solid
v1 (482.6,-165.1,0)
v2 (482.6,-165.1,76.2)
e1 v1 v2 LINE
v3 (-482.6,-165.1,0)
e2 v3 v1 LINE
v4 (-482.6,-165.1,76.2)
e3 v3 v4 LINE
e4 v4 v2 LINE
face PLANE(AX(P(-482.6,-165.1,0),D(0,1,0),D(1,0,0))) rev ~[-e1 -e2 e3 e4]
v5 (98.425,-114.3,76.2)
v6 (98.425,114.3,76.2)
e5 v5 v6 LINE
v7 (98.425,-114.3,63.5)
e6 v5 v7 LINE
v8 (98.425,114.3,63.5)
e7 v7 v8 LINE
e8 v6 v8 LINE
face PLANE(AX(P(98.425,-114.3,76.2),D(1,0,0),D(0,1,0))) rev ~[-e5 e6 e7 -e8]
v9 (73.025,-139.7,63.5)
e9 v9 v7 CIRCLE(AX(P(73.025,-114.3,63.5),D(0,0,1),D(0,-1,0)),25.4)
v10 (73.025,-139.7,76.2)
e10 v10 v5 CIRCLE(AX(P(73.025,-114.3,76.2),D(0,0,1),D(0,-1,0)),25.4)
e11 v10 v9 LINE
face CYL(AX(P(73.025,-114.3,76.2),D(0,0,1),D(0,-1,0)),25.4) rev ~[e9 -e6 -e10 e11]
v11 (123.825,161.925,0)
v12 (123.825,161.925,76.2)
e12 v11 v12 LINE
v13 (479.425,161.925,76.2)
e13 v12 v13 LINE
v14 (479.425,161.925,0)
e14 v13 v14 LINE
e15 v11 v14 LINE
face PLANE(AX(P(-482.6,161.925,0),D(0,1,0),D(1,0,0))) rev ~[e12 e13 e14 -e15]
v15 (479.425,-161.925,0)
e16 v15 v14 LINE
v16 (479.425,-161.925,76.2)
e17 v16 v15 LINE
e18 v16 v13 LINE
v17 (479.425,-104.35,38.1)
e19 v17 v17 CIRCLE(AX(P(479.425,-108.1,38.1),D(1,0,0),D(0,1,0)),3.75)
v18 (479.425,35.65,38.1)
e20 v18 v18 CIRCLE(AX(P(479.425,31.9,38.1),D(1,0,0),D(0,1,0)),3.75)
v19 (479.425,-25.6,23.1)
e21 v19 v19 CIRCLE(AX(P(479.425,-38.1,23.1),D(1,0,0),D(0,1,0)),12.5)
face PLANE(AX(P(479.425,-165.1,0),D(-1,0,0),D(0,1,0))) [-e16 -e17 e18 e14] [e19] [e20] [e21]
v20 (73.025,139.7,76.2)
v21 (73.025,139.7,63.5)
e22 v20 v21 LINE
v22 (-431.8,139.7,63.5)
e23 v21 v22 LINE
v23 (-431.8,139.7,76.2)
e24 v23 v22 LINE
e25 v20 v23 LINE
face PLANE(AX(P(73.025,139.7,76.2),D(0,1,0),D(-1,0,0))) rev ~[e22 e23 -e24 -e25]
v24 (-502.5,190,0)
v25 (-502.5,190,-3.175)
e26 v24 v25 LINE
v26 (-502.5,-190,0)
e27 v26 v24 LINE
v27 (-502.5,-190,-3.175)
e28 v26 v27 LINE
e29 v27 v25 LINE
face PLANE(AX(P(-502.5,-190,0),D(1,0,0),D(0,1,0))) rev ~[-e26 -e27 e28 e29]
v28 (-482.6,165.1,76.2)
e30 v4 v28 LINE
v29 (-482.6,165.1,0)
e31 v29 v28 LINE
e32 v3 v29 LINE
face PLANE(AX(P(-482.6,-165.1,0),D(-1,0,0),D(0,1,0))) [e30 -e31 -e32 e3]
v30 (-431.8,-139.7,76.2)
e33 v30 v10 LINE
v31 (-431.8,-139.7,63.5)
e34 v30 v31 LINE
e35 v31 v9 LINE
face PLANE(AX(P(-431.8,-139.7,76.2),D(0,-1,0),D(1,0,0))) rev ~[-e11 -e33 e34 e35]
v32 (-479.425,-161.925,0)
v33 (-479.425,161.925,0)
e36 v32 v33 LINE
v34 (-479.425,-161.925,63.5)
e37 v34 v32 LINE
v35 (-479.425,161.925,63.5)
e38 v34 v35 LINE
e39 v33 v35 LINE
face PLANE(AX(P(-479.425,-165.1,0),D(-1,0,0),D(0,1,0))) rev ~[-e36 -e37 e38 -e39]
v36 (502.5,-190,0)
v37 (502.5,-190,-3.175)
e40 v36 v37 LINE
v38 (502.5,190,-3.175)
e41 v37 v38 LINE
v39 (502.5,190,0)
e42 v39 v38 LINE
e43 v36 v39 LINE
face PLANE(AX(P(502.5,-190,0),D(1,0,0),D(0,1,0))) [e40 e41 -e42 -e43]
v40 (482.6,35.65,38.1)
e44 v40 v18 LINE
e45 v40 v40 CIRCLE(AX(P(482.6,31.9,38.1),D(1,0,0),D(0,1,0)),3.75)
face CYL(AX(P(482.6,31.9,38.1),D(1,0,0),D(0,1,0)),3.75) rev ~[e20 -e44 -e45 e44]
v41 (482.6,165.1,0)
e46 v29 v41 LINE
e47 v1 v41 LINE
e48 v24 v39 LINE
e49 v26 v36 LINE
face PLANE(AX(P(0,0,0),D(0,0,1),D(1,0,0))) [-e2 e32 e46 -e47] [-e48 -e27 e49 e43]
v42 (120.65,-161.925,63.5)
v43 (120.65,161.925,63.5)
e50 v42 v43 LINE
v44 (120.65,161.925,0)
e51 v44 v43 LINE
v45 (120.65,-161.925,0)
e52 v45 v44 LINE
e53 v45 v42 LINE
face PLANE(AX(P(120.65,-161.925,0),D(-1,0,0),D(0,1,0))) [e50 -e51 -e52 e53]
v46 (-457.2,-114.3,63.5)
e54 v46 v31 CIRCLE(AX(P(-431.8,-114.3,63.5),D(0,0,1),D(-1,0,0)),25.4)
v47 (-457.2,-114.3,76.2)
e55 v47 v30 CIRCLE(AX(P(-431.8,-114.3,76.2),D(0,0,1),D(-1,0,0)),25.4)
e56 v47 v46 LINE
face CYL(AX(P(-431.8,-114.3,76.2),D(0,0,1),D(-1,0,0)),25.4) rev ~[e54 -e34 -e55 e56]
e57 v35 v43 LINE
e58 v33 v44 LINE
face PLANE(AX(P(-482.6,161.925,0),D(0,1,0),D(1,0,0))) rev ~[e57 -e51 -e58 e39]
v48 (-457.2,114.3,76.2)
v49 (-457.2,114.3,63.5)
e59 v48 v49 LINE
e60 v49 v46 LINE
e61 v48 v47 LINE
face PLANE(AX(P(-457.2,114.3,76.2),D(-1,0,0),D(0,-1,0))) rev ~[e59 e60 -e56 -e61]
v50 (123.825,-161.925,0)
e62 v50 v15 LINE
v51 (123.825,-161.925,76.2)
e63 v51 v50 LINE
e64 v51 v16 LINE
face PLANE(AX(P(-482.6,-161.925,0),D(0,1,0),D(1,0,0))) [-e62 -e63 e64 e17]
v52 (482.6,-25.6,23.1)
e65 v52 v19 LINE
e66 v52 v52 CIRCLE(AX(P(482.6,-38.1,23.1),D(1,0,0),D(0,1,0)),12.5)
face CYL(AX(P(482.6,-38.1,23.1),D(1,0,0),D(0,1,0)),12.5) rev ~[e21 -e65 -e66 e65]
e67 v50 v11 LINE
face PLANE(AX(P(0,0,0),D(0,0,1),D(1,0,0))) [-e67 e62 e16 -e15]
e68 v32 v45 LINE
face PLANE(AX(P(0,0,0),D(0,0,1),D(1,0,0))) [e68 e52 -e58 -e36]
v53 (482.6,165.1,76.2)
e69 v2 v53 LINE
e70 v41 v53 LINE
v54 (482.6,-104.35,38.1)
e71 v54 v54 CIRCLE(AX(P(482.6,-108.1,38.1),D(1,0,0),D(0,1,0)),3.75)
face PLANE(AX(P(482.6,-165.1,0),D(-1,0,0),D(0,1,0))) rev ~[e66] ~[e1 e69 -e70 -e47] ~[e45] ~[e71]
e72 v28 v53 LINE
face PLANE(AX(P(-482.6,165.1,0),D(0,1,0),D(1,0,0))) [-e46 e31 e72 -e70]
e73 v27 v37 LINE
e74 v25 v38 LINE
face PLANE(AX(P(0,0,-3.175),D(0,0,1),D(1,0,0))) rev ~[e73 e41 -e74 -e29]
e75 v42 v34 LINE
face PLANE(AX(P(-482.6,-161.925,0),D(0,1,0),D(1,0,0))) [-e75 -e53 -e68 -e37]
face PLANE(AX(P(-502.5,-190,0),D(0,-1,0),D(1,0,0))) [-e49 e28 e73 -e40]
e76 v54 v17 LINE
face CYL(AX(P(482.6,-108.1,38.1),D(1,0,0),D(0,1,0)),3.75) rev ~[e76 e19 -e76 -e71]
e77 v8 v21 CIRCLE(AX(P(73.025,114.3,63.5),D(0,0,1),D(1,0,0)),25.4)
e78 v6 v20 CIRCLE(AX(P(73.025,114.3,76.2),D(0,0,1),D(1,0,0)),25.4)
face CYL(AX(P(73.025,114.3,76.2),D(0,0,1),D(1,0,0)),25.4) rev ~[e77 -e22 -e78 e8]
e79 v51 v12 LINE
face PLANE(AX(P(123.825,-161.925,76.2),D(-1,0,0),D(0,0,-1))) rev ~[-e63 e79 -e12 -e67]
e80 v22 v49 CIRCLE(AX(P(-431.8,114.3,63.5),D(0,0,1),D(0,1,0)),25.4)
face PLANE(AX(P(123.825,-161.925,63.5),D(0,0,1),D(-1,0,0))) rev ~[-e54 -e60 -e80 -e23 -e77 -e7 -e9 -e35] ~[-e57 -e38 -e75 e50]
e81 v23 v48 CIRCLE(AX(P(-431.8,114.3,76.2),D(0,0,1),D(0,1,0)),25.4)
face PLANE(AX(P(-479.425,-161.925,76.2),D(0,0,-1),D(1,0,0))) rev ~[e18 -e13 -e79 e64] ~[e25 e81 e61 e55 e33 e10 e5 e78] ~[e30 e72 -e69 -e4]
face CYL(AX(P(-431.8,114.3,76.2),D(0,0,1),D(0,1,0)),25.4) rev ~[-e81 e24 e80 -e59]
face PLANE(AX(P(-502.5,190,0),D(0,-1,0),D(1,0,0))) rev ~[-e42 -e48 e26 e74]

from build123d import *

# Parameters (mm, degrees)
F0_W        = 1005
F0_H        = 380
F1_DEPTH    = 3.175
F2_W        = 965.2
F2_H        = 330.2
F3_DEPTH    = 76.2
F4_T        = 3.175
F4_T3_DEPTH = 336.55
F4_T5_DEPTH = 971.55
F5_R        = 3.75
F5_R_2      = 12.5
F6_DEPTH    = 3.175
F7_W        = 3.175
F7_H        = 323.85
F8_DEPTH    = 63.5
F10_DEPTH   = 325
F12_DEPTH   = 12.7


# Not quite as in the source:
# - a shell that OpenCascade refuses in one call is made with other operations: the cavity is built on its own and cut out


with BuildPart() as f1:
    # F0 (on Top) → F1 (new body)
    with BuildSketch(Plane.XY):
        Rectangle(F0_W, F0_H)
    extrude(amount=-F1_DEPTH)

    # F2 (on face) → F3 (join)
    with BuildSketch(Plane.XY):
        Rectangle(F2_W, F2_H)
    extrude(amount=F3_DEPTH)

    # F4: shell of thickness 3.175, made by hand


with BuildPart() as f4_core1:
    # F4_t2: copy of F1
    add(f1.part)

    # the walls: a layer under each face that stays
    f4_faces = [f4_core1.faces().sort_by_distance(p)[0] for p in [
        (502.5, 0, -1.5875),
        (0, -190, -1.5875),
        (0, 190, -1.5875),
        (-469, -177.3333333333, 0),
        (0, 0, -3.175),
        (-502.5, 0, -1.5875),
        (482.6, 0, 38.1),
        (0, 165.1, 38.1),
        (-482.6, 0, 38.1),
        (0, -165.1, 38.1),
    ]]
    thicken(f4_faces, amount=-F4_T, mode=Mode.SUBTRACT)

    # F4_s4 → F4_t3 (cut)
    with BuildSketch(Plane.XZ.offset(-168.275)):
        Polygon((482.63175, 0.03175), (482.6, -3.175), (479.425, -3.175), (479.425, 0), align=None)
        Polygon((-482.63175, 0.03175), (-482.6, -3.175), (-479.425, -3.175), (-479.425, 0), align=None)
    extrude(amount=F4_T3_DEPTH, mode=Mode.SUBTRACT)

    # F4_s6 → F4_t5 (cut)
    with BuildSketch(Plane.YZ.offset(-485.775)):
        Polygon((165.13175, 0.03175), (165.1, -3.175), (161.925, -3.175), (161.925, 0), align=None)
        Polygon((-165.13175, 0.03175), (-165.1, -3.175), (-161.925, -3.175), (-161.925, 0), align=None)
    extrude(amount=F4_T5_DEPTH, mode=Mode.SUBTRACT)


with BuildPart() as f1_1:
    add(f1.part)

    # what is left inside the walls is the cavity
    f4_cavity = [f4_core1.part.solids().sort_by_distance(p)[0] for p in [
        (0, -53.975, 0.03175),
    ]]
    add(f4_cavity, mode=Mode.SUBTRACT)

    # F5 (on face) → F6 (cut)
    with BuildSketch(Plane.YZ.offset(482.6)):
        with Locations((-108.1, 38.1)):
            Circle(F5_R)
        with Locations((-38.1, 23.1)):
            Circle(F5_R_2)
        with Locations((31.9, 38.1)):
            Circle(F5_R)
    extrude(amount=-F6_DEPTH, mode=Mode.SUBTRACT)

    # F7 (on face) → F8 (join)
    with BuildSketch(Plane.XY):
        with Locations((122.2375, 0)):
            Rectangle(F7_W, F7_H)
    extrude(amount=F8_DEPTH)

    # F9 (on face) → F10 (join)
    with BuildSketch(Plane(origin=(0, -161.925, 0), x_dir=(-1, 0, 0), z_dir=(0, 1, 0))):
        Polygon((-123.825, 76.2), (-123.825, 63.5), (-120.65, 63.5), (479.425, 63.5), (479.425, 76.2), align=None)
    extrude(amount=F10_DEPTH)

    # F11 (on face) → F12 (cut)
    with BuildSketch(Plane.XY.offset(76.2)):
        with BuildLine():
            ThreePointArc((-457.2, -114.3), (-449.7605122421, -132.2605122421), (-431.8, -139.7))
            Line((-431.8, -139.7), (73.025, -139.7))
            ThreePointArc((73.025, -139.7), (90.9855122421, -132.2605122421), (98.425, -114.3))
            Line((98.425, -114.3), (98.425, 114.3))
            ThreePointArc((98.425, 114.3), (90.9855122421, 132.2605122421), (73.025, 139.7))
            Line((73.025, 139.7), (-431.8, 139.7))
            ThreePointArc((-431.8, 139.7), (-449.7605122421, 132.2605122421), (-457.2, 114.3))
            Line((-457.2, 114.3), (-457.2, -114.3))
        make_face()
    extrude(amount=-F12_DEPTH, mode=Mode.SUBTRACT)


solid = f1_1.part
